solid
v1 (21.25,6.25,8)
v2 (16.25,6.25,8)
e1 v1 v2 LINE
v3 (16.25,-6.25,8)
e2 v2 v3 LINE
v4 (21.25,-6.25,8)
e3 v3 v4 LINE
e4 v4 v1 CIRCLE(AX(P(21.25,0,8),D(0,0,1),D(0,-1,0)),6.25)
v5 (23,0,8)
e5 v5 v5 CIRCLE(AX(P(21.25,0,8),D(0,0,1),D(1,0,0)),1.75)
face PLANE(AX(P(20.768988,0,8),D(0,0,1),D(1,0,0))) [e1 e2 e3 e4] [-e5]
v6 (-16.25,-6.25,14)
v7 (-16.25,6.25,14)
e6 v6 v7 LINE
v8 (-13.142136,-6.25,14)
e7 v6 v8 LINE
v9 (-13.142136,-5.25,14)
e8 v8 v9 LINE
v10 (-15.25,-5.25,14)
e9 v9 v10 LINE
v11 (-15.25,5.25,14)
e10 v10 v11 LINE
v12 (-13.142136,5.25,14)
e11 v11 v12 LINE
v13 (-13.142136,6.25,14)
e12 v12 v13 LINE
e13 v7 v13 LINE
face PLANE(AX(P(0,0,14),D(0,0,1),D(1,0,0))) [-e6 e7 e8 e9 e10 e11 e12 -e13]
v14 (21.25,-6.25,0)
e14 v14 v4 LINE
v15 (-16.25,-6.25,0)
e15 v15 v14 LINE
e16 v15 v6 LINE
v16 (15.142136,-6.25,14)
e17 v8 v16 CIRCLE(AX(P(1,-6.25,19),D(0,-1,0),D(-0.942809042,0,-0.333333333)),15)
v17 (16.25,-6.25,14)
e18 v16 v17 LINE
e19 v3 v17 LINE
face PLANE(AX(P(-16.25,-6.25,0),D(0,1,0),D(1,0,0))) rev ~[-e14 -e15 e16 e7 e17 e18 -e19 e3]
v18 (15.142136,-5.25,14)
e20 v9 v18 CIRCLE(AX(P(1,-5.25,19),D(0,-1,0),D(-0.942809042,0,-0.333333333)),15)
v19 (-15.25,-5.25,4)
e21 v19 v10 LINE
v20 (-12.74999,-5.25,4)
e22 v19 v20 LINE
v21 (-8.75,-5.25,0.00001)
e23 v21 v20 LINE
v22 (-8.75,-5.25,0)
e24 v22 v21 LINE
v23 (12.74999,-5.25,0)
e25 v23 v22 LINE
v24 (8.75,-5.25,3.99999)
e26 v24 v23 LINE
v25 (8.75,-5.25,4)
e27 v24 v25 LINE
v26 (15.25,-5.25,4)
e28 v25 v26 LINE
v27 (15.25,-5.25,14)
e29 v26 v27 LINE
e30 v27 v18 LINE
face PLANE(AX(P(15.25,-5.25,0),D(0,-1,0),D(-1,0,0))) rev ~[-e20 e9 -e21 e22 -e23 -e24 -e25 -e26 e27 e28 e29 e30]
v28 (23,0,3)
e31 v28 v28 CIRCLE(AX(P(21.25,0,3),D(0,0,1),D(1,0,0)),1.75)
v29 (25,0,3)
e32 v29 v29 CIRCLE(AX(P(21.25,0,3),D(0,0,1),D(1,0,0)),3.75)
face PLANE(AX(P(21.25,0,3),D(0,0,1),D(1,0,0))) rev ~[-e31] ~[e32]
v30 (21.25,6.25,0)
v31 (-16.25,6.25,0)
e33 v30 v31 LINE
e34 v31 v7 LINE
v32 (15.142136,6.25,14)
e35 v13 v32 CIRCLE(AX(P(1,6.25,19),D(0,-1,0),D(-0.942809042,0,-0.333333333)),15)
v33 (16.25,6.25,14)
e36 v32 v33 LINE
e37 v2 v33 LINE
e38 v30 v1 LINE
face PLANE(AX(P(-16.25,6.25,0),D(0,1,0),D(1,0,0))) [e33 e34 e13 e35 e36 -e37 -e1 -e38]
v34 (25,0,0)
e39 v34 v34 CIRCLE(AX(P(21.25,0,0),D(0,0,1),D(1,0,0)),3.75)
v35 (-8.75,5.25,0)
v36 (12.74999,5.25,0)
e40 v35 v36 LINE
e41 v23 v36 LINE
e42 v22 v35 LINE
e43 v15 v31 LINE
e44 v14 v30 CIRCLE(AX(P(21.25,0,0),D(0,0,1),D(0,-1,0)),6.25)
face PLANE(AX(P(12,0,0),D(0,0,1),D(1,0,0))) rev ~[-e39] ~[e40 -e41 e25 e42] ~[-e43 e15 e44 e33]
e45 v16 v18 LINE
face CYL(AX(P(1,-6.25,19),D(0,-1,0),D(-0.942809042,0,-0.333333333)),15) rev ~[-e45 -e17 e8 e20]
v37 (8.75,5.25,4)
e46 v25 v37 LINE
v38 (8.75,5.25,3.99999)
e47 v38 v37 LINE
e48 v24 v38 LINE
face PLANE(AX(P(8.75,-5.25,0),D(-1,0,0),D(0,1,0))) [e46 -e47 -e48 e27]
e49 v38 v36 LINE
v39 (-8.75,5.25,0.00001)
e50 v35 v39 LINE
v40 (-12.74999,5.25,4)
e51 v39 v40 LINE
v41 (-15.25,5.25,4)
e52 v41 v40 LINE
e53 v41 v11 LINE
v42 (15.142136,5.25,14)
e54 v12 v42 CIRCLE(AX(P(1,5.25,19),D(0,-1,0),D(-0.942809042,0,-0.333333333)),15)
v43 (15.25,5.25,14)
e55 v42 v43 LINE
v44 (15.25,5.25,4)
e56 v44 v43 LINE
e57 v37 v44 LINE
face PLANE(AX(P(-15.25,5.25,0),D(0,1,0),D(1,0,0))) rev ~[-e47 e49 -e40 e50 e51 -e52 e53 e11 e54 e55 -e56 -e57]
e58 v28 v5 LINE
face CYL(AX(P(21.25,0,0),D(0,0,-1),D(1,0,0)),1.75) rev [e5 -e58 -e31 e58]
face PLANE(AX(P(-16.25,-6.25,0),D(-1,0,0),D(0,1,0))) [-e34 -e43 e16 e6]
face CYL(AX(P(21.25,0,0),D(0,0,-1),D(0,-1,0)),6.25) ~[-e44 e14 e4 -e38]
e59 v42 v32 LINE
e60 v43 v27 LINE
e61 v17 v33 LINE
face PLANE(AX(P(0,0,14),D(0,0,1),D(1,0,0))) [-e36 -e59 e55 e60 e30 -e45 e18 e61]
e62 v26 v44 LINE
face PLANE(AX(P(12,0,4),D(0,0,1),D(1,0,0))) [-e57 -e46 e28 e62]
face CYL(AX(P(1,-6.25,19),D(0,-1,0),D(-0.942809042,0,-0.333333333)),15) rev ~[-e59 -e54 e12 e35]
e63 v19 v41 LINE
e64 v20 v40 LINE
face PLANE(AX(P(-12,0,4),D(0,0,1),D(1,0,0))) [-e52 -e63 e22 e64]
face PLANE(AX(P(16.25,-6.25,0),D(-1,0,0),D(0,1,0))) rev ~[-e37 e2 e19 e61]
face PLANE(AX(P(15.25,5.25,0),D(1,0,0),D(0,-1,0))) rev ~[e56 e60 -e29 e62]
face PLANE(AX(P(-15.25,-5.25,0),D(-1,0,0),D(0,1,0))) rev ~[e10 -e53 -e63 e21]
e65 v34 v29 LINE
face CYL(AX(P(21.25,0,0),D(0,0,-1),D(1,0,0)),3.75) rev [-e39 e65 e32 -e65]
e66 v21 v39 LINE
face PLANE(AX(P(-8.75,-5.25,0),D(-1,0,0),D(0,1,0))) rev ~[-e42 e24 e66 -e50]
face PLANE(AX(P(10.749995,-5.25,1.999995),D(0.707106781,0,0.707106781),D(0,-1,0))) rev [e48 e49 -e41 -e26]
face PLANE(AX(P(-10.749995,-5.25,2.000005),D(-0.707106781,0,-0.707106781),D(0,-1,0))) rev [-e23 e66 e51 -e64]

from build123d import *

# Parameters (mm, degrees)
F0_R     = 1.75
F1_DEPTH = 8
F0_W     = 32.5
F0_H     = 12.5
F2_DEPTH = 14
F0_W_2   = 6.5
F0_H_2   = 10.5
F3_DEPTH = 4
F4_SIZE  = 3.99999
F6_DEPTH = 25
F7_R     = 3.75
F7_R_2   = 1.75
F8_DEPTH = 3


# Not quite as in the source:
# - a fillet or chamfer is up to 0.001 mm smaller than in the source, because OpenCascade refuses the exact size


with BuildPart() as f1:
    # F0 (on Top) → F1 (new body)
    with BuildSketch(Plane.XY):
        with BuildLine():
            Line((16.25, 6.25), (16.25, -6.25))
            Line((16.25, -6.25), (21.25, -6.25))
            ThreePointArc((21.25, -6.25), (27.5, 0), (21.25, 6.25))
            Line((21.25, 6.25), (16.25, 6.25))
        make_face()
        with Locations((21.25, 0)):
            Circle(F0_R, mode=Mode.SUBTRACT)
    extrude(amount=F1_DEPTH)

    # F0 (on Top) → F2 (join)
    with BuildSketch(Plane.XY):
        Rectangle(F0_W, F0_H)
        Polygon((15.25, 5.25), (15.25, -5.25), (8.75, -5.25), (-8.75, -5.25), (-15.25, -5.25), (-15.25, 5.25), (-8.75, 5.25), (8.75, 5.25), align=None, mode=Mode.SUBTRACT)
    extrude(amount=F2_DEPTH)

    # F0 (on Top) → F3 (join)
    with BuildSketch(Plane.XY):
        with Locations((12, 0)):
            Rectangle(F0_W_2, F0_H_2)
        with Locations((-12, 0)):
            Rectangle(F0_W_2, F0_H_2)
    extrude(amount=F3_DEPTH)

    # F4 (size 4 in the source; OpenCascade refuses exactly that, so slightly less here)
    f4_edges = [f1.edges().sort_by_distance(p)[0] for p in [
        (-8.75, 0, 4),
        (8.75, 0, 0),
    ]]
    chamfer(f4_edges, length=F4_SIZE)

    # F5 (on face) → F6 (cut)
    with BuildSketch(Plane.XZ.offset(6.25)):
        with BuildLine():
            Line((15.1421356237, 14), (-13.1421356237, 14))
            ThreePointArc((-13.1421356237, 14), (1, 4), (15.1421356237, 14))
        make_face()
    extrude(amount=-F6_DEPTH, mode=Mode.SUBTRACT)

    # F7 (on face) → F8 (cut)
    with BuildSketch(Plane.XY):
        with Locations((21.25, 0)):
            Circle(F7_R)
        with Locations((21.25, 0)):
            Circle(F7_R_2, mode=Mode.SUBTRACT)
    extrude(amount=F8_DEPTH, mode=Mode.SUBTRACT)


solid = f1.part
